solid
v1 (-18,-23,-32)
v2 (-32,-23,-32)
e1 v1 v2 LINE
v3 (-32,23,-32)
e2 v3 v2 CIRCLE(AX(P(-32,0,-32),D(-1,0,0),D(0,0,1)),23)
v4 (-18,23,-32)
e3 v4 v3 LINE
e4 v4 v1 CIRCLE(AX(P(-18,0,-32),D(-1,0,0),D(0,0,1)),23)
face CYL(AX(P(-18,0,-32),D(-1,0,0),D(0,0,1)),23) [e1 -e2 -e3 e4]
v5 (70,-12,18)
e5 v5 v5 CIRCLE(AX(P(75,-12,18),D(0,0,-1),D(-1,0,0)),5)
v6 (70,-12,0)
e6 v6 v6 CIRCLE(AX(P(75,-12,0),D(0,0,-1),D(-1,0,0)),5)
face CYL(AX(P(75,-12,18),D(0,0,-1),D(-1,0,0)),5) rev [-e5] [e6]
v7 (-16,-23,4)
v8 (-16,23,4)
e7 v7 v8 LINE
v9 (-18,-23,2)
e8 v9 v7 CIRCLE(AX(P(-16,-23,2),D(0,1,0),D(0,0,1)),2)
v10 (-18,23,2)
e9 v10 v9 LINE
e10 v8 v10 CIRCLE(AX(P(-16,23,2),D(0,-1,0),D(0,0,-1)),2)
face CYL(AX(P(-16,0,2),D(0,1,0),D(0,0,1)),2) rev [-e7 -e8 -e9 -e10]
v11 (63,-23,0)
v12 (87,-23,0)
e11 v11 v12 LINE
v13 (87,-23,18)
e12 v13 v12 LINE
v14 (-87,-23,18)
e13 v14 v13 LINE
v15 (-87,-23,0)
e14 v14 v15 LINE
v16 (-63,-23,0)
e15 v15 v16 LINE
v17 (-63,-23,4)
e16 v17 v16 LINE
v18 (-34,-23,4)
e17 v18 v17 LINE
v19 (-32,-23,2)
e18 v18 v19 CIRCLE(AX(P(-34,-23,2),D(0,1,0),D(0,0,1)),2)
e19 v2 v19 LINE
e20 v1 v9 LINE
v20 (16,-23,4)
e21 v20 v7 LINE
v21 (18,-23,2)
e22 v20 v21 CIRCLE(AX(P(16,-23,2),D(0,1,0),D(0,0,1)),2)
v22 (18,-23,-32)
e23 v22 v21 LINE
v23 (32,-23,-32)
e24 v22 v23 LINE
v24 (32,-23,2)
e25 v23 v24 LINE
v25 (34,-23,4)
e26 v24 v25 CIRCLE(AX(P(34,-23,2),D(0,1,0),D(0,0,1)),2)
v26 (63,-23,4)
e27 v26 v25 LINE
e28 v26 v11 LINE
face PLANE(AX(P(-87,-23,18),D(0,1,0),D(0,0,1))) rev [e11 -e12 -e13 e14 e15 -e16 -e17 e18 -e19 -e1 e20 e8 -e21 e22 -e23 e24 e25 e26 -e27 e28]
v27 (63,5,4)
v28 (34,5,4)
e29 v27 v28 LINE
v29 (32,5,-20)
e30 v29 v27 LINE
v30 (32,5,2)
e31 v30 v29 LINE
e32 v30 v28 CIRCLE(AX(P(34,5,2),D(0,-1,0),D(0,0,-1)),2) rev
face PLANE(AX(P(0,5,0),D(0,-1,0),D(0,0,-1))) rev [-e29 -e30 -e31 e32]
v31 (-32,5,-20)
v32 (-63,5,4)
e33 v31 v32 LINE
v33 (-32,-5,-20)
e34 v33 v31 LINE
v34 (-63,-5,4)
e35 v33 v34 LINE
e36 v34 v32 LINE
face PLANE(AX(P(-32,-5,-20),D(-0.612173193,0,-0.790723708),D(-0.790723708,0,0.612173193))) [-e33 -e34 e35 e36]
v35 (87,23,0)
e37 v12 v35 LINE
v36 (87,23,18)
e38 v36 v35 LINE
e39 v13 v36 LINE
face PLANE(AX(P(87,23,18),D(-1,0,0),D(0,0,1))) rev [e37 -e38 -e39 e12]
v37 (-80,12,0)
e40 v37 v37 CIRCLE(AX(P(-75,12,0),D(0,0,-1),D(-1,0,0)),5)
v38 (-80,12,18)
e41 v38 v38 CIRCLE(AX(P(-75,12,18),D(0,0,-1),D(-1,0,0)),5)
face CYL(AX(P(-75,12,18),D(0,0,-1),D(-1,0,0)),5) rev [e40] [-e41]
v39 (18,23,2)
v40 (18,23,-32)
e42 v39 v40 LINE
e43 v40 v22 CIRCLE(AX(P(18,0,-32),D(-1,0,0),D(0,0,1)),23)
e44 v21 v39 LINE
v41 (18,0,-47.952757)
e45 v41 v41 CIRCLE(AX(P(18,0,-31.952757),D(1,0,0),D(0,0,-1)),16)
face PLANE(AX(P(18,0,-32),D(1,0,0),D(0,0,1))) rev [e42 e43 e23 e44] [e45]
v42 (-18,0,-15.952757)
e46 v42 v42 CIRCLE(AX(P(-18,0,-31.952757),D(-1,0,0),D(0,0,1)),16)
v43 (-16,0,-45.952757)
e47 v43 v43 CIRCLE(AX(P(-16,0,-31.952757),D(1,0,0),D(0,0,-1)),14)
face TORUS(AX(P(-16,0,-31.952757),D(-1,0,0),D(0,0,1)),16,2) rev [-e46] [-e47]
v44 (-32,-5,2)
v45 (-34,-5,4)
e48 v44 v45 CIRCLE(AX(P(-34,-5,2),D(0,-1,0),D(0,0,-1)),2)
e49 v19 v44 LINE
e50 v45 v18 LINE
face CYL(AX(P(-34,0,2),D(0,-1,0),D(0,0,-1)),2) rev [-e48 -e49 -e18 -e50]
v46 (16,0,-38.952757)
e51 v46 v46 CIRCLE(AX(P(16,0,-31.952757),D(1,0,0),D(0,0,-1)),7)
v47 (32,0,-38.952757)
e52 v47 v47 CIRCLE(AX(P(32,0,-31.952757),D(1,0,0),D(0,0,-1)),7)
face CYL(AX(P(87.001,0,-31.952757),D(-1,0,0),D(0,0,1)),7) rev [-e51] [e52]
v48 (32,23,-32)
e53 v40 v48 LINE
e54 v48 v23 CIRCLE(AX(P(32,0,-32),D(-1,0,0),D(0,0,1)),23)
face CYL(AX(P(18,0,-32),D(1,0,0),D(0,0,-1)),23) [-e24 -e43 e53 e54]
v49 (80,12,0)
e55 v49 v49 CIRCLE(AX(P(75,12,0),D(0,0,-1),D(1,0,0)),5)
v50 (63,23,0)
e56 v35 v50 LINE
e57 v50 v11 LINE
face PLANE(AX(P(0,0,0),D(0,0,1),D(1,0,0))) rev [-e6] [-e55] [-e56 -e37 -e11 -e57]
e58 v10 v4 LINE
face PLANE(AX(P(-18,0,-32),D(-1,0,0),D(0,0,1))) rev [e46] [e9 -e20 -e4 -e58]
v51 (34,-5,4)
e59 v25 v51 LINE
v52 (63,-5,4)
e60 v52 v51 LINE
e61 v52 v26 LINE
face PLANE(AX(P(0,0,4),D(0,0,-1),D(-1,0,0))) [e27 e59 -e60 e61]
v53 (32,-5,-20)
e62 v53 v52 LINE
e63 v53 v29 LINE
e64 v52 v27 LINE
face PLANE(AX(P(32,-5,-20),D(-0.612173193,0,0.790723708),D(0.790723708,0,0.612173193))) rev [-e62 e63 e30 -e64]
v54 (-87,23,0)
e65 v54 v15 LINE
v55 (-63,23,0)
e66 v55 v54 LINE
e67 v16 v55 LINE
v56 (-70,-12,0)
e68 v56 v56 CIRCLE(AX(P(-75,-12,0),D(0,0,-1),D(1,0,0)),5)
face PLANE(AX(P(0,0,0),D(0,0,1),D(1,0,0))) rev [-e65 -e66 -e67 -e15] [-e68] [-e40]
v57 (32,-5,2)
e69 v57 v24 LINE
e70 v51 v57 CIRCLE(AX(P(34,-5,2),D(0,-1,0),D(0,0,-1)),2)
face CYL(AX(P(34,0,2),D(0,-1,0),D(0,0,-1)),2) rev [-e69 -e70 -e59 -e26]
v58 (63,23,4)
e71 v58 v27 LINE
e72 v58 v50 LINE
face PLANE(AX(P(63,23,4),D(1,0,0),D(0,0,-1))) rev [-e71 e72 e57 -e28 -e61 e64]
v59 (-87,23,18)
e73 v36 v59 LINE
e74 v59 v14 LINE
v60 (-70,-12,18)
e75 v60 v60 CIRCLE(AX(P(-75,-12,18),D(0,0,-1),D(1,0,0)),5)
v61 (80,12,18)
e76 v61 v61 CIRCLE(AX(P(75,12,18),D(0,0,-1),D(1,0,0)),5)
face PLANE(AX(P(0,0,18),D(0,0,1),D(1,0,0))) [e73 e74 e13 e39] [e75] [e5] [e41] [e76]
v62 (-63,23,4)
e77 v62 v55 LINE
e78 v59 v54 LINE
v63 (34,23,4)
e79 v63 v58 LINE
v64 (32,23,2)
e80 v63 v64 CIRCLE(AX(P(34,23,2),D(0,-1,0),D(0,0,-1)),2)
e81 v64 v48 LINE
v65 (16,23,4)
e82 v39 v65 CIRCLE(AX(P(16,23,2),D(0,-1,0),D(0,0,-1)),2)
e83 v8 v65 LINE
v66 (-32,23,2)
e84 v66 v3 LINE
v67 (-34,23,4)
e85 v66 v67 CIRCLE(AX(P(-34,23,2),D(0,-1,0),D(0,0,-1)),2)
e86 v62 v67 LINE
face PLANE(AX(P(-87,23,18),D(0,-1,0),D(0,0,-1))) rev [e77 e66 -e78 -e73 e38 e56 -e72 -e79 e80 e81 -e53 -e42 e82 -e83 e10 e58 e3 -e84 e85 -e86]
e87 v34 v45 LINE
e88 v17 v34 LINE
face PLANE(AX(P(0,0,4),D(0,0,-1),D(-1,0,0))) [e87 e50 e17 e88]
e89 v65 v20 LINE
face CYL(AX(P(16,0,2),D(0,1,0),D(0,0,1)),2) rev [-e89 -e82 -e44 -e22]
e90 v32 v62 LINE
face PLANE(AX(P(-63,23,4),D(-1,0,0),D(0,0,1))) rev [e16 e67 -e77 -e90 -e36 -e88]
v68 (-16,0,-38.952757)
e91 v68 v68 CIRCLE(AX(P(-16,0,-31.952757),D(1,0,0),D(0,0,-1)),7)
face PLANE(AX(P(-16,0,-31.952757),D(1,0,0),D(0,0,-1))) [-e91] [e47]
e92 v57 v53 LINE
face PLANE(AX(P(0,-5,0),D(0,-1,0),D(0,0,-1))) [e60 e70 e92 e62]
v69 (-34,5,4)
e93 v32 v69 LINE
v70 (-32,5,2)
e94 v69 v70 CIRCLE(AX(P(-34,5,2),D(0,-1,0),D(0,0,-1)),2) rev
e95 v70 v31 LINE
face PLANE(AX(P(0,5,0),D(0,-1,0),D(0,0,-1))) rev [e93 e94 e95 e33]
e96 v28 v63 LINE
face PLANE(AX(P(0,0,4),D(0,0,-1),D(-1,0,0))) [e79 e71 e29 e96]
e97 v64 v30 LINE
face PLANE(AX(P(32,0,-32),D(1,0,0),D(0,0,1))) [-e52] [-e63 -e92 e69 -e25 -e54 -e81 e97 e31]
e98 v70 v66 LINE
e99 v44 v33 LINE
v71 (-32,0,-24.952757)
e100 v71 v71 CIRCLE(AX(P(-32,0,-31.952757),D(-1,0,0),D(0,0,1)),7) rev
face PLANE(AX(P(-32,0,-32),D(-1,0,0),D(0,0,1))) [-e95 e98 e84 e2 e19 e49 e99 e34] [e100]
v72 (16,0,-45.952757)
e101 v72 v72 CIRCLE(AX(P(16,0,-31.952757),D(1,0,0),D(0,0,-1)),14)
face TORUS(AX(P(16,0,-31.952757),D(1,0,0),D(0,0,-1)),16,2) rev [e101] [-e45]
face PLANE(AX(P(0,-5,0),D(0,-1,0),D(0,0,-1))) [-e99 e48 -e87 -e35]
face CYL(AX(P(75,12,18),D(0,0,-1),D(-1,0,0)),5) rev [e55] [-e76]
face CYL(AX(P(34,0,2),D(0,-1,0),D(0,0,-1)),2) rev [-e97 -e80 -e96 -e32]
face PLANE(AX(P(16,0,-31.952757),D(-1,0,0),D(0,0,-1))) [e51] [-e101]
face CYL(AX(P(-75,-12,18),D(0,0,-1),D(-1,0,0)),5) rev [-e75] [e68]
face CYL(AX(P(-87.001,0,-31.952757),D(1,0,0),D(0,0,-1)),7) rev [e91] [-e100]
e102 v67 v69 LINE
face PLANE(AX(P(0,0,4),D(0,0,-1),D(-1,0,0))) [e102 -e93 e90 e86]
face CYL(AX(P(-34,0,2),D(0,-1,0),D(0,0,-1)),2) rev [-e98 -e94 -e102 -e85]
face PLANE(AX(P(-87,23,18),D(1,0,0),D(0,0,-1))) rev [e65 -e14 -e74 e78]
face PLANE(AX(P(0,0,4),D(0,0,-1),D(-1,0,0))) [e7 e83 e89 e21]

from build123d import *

# Parameters (mm, degrees)
SKETCH1_W           = 174
SKETCH1_H           = 46
BOSS_EXTRUDE1_DEPTH = 18
SKETCH2_W           = 126
SKETCH2_H           = 46
CUT_EXTRUDE1_DEPTH  = 4
SKETCH3_R           = 5
CUT_EXTRUDE2_DEPTH  = 92.771455257
BOSS_EXTRUDE3_DEPTH = 14
SKETCH6_R           = 14
BOSS_EXTRUDE5_DEPTH = 2
CUT_EXTRUDE3_REACH  = 121.008
SKETCH7_R           = 7
BOSS_EXTRUDE7_DEPTH = 5
FILLET1_R           = 2
FILLET2_R           = 2


with BuildPart() as part:
    # Sketch1 → Boss-Extrude1 (new body)
    with BuildSketch(Plane.XY):
        Rectangle(SKETCH1_W, SKETCH1_H)
    extrude(amount=BOSS_EXTRUDE1_DEPTH)

    # Sketch2 → Cut-Extrude1 (cut)
    with BuildSketch(Plane(origin=(0, 0, 0), x_dir=(-1, 0, 0), z_dir=(0, 0, -1))):
        Rectangle(SKETCH2_W, SKETCH2_H)
    extrude(amount=-CUT_EXTRUDE1_DEPTH, mode=Mode.SUBTRACT)

    # Sketch3 → Cut-Extrude2 (cut, through all)
    with BuildSketch(Plane(origin=(0, 0, 0), x_dir=(-1, 0, 0), z_dir=(0, 0, -1))):
        with Locations((75, 12)):
            Circle(SKETCH3_R)
        with Locations(Location((75, -12, 0), (0, 0, 180))):
            Circle(SKETCH3_R)
        with Locations((-75, -12)):
            Circle(SKETCH3_R)
        with Locations(Location((-75, 12, 0), (0, 0, 180))):
            Circle(SKETCH3_R)
    extrude(amount=-CUT_EXTRUDE2_DEPTH, mode=Mode.SUBTRACT)

    # Sketch4 → Boss-Extrude3 (add)
    with BuildSketch(Plane.ZY.offset(32)):
        with BuildLine():
            Line((4, 23), (-32, 23))
            ThreePointArc((-32, 23), (-55, 0), (-32, -23))
            Line((-32, -23), (4, -23))
            Line((4, -23), (4, 23))
        make_face()
    boss_extrude3 = extrude(amount=-BOSS_EXTRUDE3_DEPTH)

    # Sketch6 → Boss-Extrude5 (add)
    with BuildSketch(Plane(origin=(-18, 0, 0), x_dir=(0, 0, -1), z_dir=(1, 0, 0))):
        with Locations(Location((31.952757206, 0, 0), (0, 0, 180))):
            Circle(SKETCH6_R)
    boss_extrude5 = extrude(amount=BOSS_EXTRUDE5_DEPTH)

    # Sketch7 → Cut-Extrude3 (cut, up to next)
    with BuildSketch(Plane(origin=(-16, 0, 0), x_dir=(0, 0, -1), z_dir=(1, 0, 0)), mode=Mode.PRIVATE) as cut_extrude3_sk1:
        with Locations((31.952757206, 0)):
            Circle(SKETCH7_R)
    cut_extrude3_tool1 = extrude(cut_extrude3_sk1.sketch, amount=-CUT_EXTRUDE3_REACH, mode=Mode.PRIVATE) & part.part
    cut_extrude3 = cut_extrude3_tool1.solids().sort_by_distance((-16, 0, -31.952757))[0]
    add(cut_extrude3, mode=Mode.SUBTRACT)

    # Sketch9 → Boss-Extrude7 (add, symmetric)
    with BuildSketch(Plane(origin=(0, 0, 0), x_dir=(1, 0, 0), z_dir=(0, 1, 0))):
        Polygon((-32, 20), (-63, -4), (-32, -4), align=None)
    boss_extrude7 = extrude(amount=BOSS_EXTRUDE7_DEPTH, both=True)

    # Mirror1: Boss-Extrude3, Boss-Extrude5, Cut-Extrude3, Boss-Extrude7 across plane
    add(boss_extrude3.mirror(Plane(origin=(0, 0, 0), x_dir=(0, 0, 1), z_dir=(1, 0, 0))))
    add(boss_extrude5.mirror(Plane(origin=(0, 0, 0), x_dir=(0, 0, 1), z_dir=(1, 0, 0))))
    add(cut_extrude3.mirror(Plane(origin=(0, 0, 0), x_dir=(0, 0, 1), z_dir=(1, 0, 0))), mode=Mode.SUBTRACT)
    add(boss_extrude7.mirror(Plane(origin=(0, 0, 0), x_dir=(0, 0, 1), z_dir=(1, 0, 0))))

    # Fillet1
    fillet1_edges = [part.edges().sort_by_distance(p)[0] for p in [
        (32, 14, 4),
        (-18, 0, 4),
        (-32, -14, 4),
        (-32, 14, 4),
        (32, -14, 4),
        (18, 0, 4),
    ]]
    fillet(fillet1_edges, radius=FILLET1_R)

    # Fillet2
    fillet2_edges = [part.edges().sort_by_distance(p)[0] for p in [
        (-18, 0, -45.952757206),
        (18, 0, -45.952757206),
    ]]
    fillet(fillet2_edges, radius=FILLET2_R - 0.0001)  # a hair under: the kernel refuses the full size


solid = part.part
